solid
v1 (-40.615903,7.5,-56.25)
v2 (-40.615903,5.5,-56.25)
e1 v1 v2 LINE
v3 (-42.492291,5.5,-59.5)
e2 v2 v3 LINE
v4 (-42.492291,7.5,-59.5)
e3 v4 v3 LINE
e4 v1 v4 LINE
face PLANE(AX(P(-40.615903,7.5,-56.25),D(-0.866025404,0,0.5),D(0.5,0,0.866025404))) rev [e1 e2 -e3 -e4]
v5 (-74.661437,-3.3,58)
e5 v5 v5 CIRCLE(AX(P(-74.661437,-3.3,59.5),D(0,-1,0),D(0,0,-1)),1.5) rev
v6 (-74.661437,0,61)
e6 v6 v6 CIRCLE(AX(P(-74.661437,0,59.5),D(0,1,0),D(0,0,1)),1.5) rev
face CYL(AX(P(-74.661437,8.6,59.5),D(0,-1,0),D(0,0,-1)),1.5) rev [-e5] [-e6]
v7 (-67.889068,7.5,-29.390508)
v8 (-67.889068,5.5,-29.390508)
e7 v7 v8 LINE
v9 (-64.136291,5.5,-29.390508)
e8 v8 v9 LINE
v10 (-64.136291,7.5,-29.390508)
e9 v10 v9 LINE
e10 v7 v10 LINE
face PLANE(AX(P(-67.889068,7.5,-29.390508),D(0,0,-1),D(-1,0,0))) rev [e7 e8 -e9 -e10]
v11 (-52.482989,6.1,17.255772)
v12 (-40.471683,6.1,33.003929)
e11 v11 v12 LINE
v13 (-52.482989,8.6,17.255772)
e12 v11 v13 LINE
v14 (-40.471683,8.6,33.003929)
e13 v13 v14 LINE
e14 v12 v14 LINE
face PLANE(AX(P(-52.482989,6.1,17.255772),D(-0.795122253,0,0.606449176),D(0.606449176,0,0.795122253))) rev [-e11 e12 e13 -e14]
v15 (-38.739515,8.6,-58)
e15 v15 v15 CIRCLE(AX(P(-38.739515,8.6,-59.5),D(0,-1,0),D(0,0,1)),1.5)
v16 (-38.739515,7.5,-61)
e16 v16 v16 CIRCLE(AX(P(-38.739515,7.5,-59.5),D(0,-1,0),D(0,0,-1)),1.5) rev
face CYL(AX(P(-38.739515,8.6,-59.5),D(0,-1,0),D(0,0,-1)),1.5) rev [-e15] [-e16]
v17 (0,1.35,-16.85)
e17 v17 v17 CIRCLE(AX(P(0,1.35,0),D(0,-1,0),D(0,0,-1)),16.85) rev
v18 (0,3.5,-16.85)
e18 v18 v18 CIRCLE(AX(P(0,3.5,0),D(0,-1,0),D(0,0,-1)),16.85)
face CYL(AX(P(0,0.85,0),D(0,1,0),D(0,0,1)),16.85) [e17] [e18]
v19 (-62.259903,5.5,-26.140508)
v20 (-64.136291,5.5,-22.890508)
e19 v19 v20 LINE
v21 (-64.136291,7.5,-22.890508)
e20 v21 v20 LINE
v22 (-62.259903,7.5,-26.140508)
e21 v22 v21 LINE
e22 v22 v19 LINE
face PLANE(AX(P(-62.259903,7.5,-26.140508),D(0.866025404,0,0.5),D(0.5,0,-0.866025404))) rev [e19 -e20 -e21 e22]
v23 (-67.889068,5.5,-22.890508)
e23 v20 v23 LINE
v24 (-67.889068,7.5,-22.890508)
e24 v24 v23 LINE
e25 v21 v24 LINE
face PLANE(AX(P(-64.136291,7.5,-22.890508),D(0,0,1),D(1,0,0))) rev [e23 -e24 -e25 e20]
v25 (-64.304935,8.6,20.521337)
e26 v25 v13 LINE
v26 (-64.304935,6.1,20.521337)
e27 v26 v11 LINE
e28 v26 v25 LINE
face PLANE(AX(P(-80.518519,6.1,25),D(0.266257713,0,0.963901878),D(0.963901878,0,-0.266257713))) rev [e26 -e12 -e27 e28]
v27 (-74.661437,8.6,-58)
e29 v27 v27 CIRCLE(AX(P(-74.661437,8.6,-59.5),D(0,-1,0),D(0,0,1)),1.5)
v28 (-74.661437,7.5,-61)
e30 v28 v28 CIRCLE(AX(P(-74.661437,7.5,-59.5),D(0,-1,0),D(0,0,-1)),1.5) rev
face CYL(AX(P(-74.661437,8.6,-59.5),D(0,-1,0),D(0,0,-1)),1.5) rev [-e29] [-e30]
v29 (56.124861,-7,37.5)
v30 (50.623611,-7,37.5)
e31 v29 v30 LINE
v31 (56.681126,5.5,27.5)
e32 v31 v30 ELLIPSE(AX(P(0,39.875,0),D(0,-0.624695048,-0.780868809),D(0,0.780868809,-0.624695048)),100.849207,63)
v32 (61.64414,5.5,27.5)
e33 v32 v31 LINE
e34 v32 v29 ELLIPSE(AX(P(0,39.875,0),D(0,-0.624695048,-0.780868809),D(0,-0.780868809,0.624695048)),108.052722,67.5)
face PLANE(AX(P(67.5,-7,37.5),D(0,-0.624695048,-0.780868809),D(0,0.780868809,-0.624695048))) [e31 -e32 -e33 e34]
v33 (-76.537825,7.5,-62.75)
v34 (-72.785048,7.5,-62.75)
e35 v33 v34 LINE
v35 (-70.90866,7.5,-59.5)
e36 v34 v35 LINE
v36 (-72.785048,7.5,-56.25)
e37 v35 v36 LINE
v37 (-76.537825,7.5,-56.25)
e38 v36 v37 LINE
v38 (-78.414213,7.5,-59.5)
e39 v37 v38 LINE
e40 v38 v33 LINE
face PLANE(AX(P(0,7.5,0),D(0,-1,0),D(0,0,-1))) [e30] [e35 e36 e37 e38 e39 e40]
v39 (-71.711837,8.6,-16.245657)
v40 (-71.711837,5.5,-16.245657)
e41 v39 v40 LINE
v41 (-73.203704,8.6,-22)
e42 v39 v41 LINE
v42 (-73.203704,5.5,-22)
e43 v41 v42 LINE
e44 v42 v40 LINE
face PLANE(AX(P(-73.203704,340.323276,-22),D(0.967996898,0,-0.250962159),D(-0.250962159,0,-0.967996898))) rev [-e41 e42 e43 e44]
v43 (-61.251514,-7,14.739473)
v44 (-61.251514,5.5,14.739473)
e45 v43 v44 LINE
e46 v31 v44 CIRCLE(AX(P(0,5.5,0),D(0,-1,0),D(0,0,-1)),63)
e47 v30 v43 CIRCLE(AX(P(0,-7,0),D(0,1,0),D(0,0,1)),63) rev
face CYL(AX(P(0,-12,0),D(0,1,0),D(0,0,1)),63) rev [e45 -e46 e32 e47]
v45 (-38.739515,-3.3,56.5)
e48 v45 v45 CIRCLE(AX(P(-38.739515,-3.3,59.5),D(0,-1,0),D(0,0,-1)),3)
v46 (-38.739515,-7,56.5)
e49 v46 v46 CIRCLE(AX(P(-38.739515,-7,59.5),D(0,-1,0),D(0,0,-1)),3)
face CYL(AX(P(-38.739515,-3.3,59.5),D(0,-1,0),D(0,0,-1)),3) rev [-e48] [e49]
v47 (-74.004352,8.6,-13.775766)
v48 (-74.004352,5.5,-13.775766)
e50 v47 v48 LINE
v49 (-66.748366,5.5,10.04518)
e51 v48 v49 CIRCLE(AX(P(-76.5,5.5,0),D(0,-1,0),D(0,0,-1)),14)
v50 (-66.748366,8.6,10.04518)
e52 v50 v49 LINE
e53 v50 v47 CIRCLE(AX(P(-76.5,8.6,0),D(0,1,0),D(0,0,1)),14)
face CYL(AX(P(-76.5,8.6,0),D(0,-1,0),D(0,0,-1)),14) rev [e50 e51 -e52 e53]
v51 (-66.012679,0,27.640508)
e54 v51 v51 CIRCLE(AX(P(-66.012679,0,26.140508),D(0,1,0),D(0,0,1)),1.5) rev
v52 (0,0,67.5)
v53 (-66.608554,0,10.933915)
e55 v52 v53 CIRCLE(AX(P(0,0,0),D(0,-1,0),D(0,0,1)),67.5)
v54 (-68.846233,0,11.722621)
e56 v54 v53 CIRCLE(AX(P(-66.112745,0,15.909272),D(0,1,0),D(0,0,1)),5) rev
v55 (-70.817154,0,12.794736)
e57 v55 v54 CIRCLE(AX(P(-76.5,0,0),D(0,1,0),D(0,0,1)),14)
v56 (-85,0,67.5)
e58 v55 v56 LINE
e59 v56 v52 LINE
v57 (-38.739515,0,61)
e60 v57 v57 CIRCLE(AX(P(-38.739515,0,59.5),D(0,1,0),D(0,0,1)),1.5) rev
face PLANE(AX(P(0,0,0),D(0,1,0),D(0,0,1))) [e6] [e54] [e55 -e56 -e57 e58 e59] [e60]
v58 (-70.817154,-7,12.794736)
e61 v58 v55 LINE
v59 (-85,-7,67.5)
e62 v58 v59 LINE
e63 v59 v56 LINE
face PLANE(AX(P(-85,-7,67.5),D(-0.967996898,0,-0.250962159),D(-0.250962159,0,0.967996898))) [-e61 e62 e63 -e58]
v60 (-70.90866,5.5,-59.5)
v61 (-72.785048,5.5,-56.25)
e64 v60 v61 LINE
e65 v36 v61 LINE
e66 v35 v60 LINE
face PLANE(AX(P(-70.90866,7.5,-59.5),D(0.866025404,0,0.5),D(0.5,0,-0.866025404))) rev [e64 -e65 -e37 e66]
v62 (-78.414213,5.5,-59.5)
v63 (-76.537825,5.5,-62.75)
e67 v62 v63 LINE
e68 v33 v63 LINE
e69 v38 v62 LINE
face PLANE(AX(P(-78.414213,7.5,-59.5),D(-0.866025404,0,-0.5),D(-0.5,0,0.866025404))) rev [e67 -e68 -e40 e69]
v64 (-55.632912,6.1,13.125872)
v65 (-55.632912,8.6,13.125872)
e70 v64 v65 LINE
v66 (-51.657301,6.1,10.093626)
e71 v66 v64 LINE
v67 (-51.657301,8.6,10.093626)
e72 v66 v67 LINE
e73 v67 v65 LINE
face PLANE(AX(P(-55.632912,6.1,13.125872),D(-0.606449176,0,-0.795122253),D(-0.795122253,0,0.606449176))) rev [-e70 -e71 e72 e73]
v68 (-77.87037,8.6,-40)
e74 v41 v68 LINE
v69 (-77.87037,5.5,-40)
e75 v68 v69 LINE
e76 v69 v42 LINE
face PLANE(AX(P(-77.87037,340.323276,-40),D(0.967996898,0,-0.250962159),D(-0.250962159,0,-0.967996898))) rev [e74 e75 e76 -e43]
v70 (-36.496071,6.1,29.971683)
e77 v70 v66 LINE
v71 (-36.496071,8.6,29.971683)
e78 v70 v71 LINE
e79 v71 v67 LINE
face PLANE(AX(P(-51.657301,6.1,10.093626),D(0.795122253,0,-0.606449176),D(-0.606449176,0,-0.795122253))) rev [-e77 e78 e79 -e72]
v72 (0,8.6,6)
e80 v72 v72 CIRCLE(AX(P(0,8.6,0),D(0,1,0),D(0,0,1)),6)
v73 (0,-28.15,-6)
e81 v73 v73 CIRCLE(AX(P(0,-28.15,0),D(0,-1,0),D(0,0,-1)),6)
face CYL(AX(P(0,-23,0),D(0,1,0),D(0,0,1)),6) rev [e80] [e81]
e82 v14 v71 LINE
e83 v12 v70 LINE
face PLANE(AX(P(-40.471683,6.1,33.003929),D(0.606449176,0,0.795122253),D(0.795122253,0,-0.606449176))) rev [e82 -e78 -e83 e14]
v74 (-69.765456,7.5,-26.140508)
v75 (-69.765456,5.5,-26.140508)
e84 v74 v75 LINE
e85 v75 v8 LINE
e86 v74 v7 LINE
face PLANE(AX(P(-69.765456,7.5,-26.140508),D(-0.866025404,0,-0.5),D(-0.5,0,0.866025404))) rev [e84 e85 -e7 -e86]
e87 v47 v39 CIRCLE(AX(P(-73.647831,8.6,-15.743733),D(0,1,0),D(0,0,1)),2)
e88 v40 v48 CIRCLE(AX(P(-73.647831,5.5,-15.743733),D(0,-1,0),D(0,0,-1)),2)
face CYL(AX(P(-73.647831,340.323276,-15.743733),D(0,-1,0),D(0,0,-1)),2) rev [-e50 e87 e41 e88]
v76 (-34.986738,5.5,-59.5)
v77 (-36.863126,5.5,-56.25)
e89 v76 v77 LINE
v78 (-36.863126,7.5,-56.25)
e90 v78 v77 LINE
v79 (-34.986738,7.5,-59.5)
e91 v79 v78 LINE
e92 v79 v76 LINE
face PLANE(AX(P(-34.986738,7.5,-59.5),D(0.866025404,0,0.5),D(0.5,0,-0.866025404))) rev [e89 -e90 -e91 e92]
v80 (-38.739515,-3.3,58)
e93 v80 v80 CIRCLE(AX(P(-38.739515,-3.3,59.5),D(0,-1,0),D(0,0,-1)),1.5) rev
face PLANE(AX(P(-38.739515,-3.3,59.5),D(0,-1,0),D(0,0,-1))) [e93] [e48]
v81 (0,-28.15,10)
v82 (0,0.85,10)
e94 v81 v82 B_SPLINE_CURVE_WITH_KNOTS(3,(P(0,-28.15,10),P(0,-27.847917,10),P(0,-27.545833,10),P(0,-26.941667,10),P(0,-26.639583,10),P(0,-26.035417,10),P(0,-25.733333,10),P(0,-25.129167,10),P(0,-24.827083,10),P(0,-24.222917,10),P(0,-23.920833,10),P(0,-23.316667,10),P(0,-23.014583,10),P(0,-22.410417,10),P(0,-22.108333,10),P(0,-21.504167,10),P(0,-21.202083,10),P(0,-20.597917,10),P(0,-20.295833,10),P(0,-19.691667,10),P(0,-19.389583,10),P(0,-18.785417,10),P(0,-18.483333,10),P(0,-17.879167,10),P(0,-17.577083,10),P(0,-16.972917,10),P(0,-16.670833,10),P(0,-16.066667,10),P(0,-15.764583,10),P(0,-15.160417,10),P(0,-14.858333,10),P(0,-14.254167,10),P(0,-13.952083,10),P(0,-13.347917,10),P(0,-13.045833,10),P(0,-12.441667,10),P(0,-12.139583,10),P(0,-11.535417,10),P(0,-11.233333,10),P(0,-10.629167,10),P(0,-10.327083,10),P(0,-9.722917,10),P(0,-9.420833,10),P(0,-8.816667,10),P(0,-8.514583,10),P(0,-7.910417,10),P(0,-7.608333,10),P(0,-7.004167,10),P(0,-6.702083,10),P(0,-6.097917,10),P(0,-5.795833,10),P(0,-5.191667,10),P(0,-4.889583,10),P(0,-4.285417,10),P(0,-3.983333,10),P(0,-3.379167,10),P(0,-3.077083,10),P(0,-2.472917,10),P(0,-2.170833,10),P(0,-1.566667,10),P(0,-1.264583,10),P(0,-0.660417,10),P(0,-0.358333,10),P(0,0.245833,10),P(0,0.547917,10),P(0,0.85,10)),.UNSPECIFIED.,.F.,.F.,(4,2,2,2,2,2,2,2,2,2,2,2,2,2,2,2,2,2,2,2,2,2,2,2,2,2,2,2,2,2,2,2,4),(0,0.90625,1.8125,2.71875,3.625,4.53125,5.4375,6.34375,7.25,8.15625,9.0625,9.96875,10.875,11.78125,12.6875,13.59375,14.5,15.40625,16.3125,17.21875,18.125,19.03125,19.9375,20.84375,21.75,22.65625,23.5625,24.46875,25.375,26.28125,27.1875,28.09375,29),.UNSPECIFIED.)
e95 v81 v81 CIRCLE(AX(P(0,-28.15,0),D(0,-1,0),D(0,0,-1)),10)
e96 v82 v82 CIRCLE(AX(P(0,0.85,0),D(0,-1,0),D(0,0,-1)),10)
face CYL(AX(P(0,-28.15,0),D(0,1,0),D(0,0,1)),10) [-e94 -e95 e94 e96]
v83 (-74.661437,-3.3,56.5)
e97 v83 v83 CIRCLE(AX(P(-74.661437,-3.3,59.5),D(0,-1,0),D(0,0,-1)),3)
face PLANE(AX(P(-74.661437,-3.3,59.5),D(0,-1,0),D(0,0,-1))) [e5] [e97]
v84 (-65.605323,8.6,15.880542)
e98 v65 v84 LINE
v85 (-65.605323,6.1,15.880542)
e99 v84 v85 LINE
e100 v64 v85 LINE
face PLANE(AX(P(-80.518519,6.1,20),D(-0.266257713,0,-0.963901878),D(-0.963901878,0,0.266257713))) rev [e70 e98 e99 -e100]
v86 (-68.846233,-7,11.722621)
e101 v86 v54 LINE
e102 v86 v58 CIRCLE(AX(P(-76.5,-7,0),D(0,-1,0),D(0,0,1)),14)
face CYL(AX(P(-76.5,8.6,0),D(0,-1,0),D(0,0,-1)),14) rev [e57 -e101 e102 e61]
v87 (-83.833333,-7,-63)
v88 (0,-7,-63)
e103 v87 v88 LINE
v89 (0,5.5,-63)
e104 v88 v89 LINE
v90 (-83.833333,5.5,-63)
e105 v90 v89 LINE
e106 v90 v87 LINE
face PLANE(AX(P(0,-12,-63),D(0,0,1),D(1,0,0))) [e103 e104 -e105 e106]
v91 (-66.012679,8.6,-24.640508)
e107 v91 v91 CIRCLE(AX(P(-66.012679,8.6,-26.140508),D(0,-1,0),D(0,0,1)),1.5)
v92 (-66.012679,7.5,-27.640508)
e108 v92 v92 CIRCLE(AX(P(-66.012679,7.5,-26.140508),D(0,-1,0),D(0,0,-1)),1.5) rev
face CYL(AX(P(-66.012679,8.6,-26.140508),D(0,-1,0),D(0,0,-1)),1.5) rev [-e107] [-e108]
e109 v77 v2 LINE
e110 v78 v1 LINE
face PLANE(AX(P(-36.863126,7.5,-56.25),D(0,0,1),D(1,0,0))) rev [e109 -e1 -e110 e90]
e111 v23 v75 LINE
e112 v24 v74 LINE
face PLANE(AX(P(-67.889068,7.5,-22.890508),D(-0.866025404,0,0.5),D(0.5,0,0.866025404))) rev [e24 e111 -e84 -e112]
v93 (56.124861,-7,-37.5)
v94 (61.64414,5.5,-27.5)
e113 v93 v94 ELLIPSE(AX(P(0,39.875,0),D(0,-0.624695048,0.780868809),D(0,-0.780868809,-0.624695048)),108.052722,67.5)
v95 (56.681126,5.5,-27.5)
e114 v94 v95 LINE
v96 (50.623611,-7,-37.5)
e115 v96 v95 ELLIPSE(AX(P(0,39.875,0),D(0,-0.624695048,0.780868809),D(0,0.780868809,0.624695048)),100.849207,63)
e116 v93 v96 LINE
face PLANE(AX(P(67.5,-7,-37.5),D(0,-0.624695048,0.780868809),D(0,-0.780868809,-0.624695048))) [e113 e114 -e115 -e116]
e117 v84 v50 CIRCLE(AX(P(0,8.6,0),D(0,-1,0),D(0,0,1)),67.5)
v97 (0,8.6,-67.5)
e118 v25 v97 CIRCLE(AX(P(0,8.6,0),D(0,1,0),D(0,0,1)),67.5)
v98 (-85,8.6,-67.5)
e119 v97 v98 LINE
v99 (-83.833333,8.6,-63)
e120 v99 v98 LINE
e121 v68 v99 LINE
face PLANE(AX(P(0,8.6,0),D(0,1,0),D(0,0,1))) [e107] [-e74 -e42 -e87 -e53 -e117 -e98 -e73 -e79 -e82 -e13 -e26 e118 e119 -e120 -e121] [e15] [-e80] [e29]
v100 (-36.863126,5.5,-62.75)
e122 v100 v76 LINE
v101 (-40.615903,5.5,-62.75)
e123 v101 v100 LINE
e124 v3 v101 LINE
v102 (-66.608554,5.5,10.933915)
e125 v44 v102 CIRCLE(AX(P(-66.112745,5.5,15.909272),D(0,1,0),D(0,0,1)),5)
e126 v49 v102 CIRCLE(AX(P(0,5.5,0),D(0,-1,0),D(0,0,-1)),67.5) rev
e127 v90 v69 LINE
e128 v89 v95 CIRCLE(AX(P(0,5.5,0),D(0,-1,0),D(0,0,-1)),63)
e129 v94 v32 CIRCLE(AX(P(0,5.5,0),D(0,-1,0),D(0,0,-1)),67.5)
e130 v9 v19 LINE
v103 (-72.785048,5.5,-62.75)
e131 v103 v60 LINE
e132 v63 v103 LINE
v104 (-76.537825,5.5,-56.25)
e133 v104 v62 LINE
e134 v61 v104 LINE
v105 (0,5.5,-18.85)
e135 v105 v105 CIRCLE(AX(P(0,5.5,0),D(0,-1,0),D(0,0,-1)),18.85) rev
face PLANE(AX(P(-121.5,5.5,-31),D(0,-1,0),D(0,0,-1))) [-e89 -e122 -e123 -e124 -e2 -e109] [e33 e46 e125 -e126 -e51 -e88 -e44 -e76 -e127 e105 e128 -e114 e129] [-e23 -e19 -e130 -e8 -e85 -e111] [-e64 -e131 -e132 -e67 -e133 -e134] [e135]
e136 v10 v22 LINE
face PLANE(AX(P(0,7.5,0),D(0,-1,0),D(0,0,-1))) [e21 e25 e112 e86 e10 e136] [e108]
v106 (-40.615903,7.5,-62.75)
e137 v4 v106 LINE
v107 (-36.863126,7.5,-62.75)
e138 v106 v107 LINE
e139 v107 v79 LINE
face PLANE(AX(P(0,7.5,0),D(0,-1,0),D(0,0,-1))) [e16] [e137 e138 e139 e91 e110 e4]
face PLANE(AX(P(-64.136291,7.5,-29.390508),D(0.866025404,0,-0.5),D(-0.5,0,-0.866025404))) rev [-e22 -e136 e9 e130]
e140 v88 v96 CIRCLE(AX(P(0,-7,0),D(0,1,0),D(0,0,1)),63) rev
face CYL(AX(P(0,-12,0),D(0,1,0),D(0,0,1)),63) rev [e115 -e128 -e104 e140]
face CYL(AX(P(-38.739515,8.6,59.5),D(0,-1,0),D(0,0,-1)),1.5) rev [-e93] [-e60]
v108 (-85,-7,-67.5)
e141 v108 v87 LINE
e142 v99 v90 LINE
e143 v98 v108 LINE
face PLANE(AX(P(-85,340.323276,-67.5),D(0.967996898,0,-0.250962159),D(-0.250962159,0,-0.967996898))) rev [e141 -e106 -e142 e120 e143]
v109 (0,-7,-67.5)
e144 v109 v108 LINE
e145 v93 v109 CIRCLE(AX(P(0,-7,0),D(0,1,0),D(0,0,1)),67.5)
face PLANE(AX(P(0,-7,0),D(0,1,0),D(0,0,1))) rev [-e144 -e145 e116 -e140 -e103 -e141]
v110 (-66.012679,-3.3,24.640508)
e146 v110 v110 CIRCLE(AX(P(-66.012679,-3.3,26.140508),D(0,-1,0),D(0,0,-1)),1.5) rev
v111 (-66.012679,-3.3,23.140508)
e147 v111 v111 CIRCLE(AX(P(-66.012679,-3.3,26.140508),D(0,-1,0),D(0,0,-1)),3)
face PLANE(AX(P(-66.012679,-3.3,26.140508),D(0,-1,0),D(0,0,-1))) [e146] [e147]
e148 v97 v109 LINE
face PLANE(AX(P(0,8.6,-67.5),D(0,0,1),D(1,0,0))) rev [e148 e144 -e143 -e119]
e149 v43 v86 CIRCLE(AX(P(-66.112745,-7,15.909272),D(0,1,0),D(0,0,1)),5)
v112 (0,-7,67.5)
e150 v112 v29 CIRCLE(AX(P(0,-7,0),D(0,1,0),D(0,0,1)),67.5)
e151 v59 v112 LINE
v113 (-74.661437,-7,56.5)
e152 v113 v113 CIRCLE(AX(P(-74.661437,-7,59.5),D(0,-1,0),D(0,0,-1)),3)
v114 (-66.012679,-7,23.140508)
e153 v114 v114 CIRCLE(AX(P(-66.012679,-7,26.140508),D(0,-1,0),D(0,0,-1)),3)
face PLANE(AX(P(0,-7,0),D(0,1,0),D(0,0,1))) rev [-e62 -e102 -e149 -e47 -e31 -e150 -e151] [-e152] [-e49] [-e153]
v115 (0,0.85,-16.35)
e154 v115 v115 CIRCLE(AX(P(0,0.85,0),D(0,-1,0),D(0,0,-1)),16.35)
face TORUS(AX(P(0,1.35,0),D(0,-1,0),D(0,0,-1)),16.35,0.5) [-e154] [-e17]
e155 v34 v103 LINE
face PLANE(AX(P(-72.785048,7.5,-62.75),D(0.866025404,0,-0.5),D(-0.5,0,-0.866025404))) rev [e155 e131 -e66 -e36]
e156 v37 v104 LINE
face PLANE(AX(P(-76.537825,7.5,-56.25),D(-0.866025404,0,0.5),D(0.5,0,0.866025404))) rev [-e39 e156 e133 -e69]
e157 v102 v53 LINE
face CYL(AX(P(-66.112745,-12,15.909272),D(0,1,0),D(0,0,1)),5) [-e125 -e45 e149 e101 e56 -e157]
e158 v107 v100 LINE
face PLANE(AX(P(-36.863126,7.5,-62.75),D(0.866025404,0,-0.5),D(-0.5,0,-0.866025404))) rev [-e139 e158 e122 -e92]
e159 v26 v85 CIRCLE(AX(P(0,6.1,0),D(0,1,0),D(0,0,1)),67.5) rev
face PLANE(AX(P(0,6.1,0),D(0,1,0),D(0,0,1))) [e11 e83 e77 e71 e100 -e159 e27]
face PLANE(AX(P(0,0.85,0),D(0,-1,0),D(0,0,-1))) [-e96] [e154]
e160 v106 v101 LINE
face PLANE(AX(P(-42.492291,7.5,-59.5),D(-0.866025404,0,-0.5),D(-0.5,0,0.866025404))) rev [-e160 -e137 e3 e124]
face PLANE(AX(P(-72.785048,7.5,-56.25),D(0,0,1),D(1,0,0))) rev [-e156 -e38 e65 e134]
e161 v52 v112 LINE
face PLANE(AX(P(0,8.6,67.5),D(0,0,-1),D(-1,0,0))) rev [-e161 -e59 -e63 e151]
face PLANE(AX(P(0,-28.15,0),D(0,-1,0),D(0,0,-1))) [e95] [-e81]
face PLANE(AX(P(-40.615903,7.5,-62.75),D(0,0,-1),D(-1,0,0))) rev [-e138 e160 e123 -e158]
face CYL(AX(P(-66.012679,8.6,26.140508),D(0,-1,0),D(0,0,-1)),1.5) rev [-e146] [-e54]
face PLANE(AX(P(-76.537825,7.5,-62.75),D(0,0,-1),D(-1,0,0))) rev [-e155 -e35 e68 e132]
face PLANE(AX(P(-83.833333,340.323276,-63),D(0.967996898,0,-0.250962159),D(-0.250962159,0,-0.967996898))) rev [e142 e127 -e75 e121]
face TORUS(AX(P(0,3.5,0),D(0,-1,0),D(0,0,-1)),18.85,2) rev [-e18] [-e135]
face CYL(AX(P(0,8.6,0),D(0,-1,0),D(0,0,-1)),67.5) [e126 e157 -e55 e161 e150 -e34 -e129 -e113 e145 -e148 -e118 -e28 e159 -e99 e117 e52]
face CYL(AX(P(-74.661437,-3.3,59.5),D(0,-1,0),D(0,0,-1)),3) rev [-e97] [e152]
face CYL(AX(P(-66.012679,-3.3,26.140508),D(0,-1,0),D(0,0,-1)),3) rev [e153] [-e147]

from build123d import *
from build123d.topology import SkipClean

# Parameters (mm, degrees)
SALIENTE_EXTRUIR4_DEPTH      = 8.6
SALIENTE_EXTRUIR2_DEPTH      = 23
CORTAR_EXTRUIR1_DEPTH        = 174.347194959
CORTAR_EXTRUIR1_DEPTH_BACK   = 174.347194959
CROQUIS2_R                   = 14
CROQUIS2_R_2                 = 24
CROQUIS5_R                   = 2.5
CORTAR_EXTRUIR2_DEPTH        = 175.696336539
SALIENTE_EXTRUIR3_START      = -15.6
SALIENTE_EXTRUIR3_DEPTH      = 15.6
CORTAR_EXTRUIR3_DEPTH        = 174.347194959
CORTAR_EXTRUIR3_DEPTH_BACK   = 174.347194959
CROQUIS7_R                   = 6
CORTAR_EXTRUIR4_DEPTH        = 5
CORTAR_EXTRUIR4_DEPTH_BACK   = 12.5
REDONDEO1_R                  = 2
CROQUIS9_R                   = 16.85
CROQUIS9_R_2                 = 6
SALIENTE_EXTRUIR5_DEPTH      = 4.65
CROQUIS10_R                  = 10
CROQUIS10_R_2                = 6
SALIENTE_EXTRUIR6_DEPTH      = 29
REDONDEO2_R                  = 0.5
REDONDEO3_R                  = 2
SALIENTE_EXTRUIR7_REACH      = 177.079
CROQUIS12_R                  = 1.5
CORTAR_EXTRUIR5_DEPTH        = 174.111445318
CORTAR_EXTRUIR6_DEPTH        = 2
CROQUIS14_R                  = 3
CORTAR_EXTRUIR7_DEPTH        = 3.7
CROQUIS15_R                  = 2
CORTAR_EXTRUIR8_DEPTH        = 175.696336539
CROQUIS16_R                  = 4
CORTAR_EXTRUIR9_DEPTH        = 4
CORTAR_EXTRUIR10_DEPTH       = 10
CORTAR_EXTRUIR11_DEPTH       = 2.5
CROQUIS20_W                  = 12
CROQUIS20_H                  = 5
CORTAR_EXTRUIR12_DEPTH       = 176.700917755
REDONDEO4_R                  = 5
CORTAR_EXTRUIR13_START       = -31.6
CORTAR_EXTRUIR13_OUTLINE_W   = 12
CORTAR_EXTRUIR13_OUTLINE_H   = 5
CORTAR_EXTRUIR13_OUTLINE_R   = 2.5
CORTAR_EXTRUIR13_OUTLINE_R_2 = 24
CORTAR_EXTRUIR13_OUTLINE_R_3 = 2
CORTAR_EXTRUIR13_DEPTH       = 31.6
CORTAR_EXTRUIR14_DEPTH       = 8.6
CORTAR_EXTRUIR15_START       = 30
CORTAR_EXTRUIR15_DEPTH       = 83.132388274


# Read off the part's stored shape, not the designer's step: Cortar-Extruir13
with BuildPart() as part:
    # Croquis1 → Saliente-Extruir4 (new body)
    with BuildSketch(Plane(origin=(0, 0, 0), x_dir=(1, 0, 0), z_dir=(0, 1, 0))):
        with BuildLine():
            Line((0, -67.5), (-158, -67.5))
            Line((-158, -67.5), (-158, 67.5))
            Line((-158, 67.5), (0, 67.5))
            ThreePointArc((0, 67.5), (67.5, 0), (0, -67.5))
        make_face()
    extrude(amount=SALIENTE_EXTRUIR4_DEPTH)

    # Croquis3 → Saliente-Extruir2 (add)
    with BuildSketch(Plane.XZ):
        Polygon((-85, -67.5), (-68.148148148, -2.5), (-158, -2.5), (-158, -67.5), align=None)
    extrude(amount=SALIENTE_EXTRUIR2_DEPTH)

    # Croquis2 → Cortar-Extruir1 (cut, two sides: drawn at the far end of the back side and taken through both)
    with BuildSketch(Plane(origin=(0, 0, 0), x_dir=(1, 0, 0), z_dir=(0, 1, 0)).offset(-CORTAR_EXTRUIR1_DEPTH_BACK)):
        with Locations(Location((-76.5, 0, 0), (0, 0, 66.051358792))):
            Circle(CROQUIS2_R)
        with Locations(Location((-121.5, 31, 0), (0, 0, 90))):
            Circle(CROQUIS2_R_2)
        with Locations(Location((-121.5, -31, 0), (0, 0, 90))):
            Circle(CROQUIS2_R_2)
    extrude(amount=CORTAR_EXTRUIR1_DEPTH + CORTAR_EXTRUIR1_DEPTH_BACK, mode=Mode.SUBTRACT)

    # Croquis5 → Cortar-Extruir2 (cut, through all)
    with BuildSketch(Plane(origin=(0, 8.6, 0), x_dir=(1, 0, 0), z_dir=(0, 1, 0))):
        with Locations(Location((-145, -7.5, 0), (0, 0, 270))):
            Circle(CROQUIS5_R)
        with Locations(Location((-145, -54.5, 0), (0, 0, 270))):
            Circle(CROQUIS5_R)
        with Locations(Location((-98, -54.5, 0), (0, 0, 270))):
            Circle(CROQUIS5_R)
        with Locations(Location((-98, -7.5, 0), (0, 0, 270))):
            Circle(CROQUIS5_R)
        with Locations(Location((-145, 7.5, 0), (0, 0, 270))):
            Circle(CROQUIS5_R)
        with Locations(Location((-145, 54.5, 0), (0, 0, 270))):
            Circle(CROQUIS5_R)
    extrude(amount=-CORTAR_EXTRUIR2_DEPTH, mode=Mode.SUBTRACT)

    # Croquis6 → Saliente-Extruir3 (add)
    with BuildSketch(Plane(origin=(0, 8.6, 0), x_dir=(1, 0, 0), z_dir=(0, 1, 0)).offset(SALIENTE_EXTRUIR3_START)):
        with BuildLine():
            Line((0, -67.5), (-85, -67.5))
            Line((-85, -67.5), (-70.817153658, -12.794735536))
            ThreePointArc((-70.817153658, -12.794735536), (-62.5, 0), (-70.817153658, 12.794735536))
            Line((-70.817153658, 12.794735536), (-85, 67.5))
            Line((-85, 67.5), (0, 67.5))
            ThreePointArc((0, 67.5), (67.5, 0), (0, -67.5))
        make_face()
    extrude(amount=SALIENTE_EXTRUIR3_DEPTH)

    # Croquis7 → Cortar-Extruir3 (cut, two sides: drawn at the far end of the back side and taken through both)
    with BuildSketch(Plane(origin=(0, 0, 0), x_dir=(1, 0, 0), z_dir=(0, 1, 0)).offset(-CORTAR_EXTRUIR3_DEPTH_BACK)):
        with Locations(Location((0, 0, 0), (0, 0, 270))):
            Circle(CROQUIS7_R)
    extrude(amount=CORTAR_EXTRUIR3_DEPTH + CORTAR_EXTRUIR3_DEPTH_BACK, mode=Mode.SUBTRACT)

    # Croquis8 → Cortar-Extruir4 (cut, two sides: drawn at the far end of the back side and taken through both)
    with BuildSketch(Plane.XZ.offset(7).offset(-CORTAR_EXTRUIR4_DEPTH_BACK)):
        with BuildLine():
            Line((0, -63), (-116.397014468, -63))
            ThreePointArc((-116.397014468, -63), (-117.923471798, -62.761294784), (-119.304179798, -62.067971208))
            Line((-119.304179798, -62.067971208), (-135.454393581, -50.526261798))
            ThreePointArc((-135.454393581, -50.526261798), (-144.354214963, -23.673004816), (-121.5, -7))
            Line((-121.5, -7), (-95.5, -7))
            ThreePointArc((-95.5, -7), (-91.964466094, -5.535533906), (-90.5, -2))
            Line((-90.5, -2), (-90.5, 0))
            ThreePointArc((-90.5, 0), (-84.130208097, 11.737969347), (-70.817153658, 12.794735536))
            ThreePointArc((-70.817153658, 12.794735536), (-69.810181657, 12.29822469), (-68.84623323, 11.722621474))
            ThreePointArc((-68.84623323, 11.722621474), (-64.266892893, 11.262463458), (-61.251513841, 14.739472589))
            ThreePointArc((-61.251513841, 14.739472589), (49.485284546, 38.989827051), (0, -63))
        make_face()
    extrude(amount=CORTAR_EXTRUIR4_DEPTH + CORTAR_EXTRUIR4_DEPTH_BACK, mode=Mode.SUBTRACT)


with BuildPart() as cortar_extruir4_kept_piece:
    # of the separate pieces the step leaves, the one the design keeps (cortar_extruir4_pieces_kept)
    add(part.part.solids().sort_by_distance((0, 8.6, 67.5))[0])

    # Redondeo1
    redondeo1_edges = [cortar_extruir4_kept_piece.edges().sort_by_distance(p)[0] for p in [
        (-70.817153658, -17.5, -12.794735536),
    ]]
    fillet(redondeo1_edges, radius=REDONDEO1_R)

    # Croquis9 → Saliente-Extruir5 (add)
    with BuildSketch(Plane.XZ.offset(-5.5)):
        with Locations(Location((0, 0, 0), (0, 0, 270))):
            Circle(CROQUIS9_R)
        with Locations(Location((0, 0, 0), (0, 0, 90))):
            Circle(CROQUIS9_R_2, mode=Mode.SUBTRACT)
    extrude(amount=SALIENTE_EXTRUIR5_DEPTH)

    # Croquis10 → Saliente-Extruir6 (add)
    with BuildSketch(Plane.XZ.offset(-0.85)):
        with Locations(Location((0, 0, 0), (0, 0, 90))):
            Circle(CROQUIS10_R)
        with Locations(Location((0, 0, 0), (0, 0, 90))):
            Circle(CROQUIS10_R_2, mode=Mode.SUBTRACT)
    extrude(amount=SALIENTE_EXTRUIR6_DEPTH)

    # Redondeo2
    redondeo2_edges = [cortar_extruir4_kept_piece.edges().sort_by_distance(p)[0] for p in [
        (0, 0.85, 16.85),
    ]]
    fillet(redondeo2_edges, radius=REDONDEO2_R)

    # Redondeo3
    redondeo3_edges = [cortar_extruir4_kept_piece.edges().sort_by_distance(p)[0] for p in [
        (0, 5.5, 16.85),
    ]]
    fillet(redondeo3_edges, radius=REDONDEO3_R)

    # Croquis11 → Saliente-Extruir7 (add, up to next)
    with BuildSketch(Plane.XZ.offset(-5.5), mode=Mode.PRIVATE) as saliente_extruir7_sk1:
        with BuildLine():
            Line((-73.203703704, -22), (-77.87037037, -40))
            Line((-77.87037037, -40), (-99.251404539, -40))
            ThreePointArc((-99.251404539, -40), (-97.5, -31), (-99.251404539, -22))
            Line((-99.251404539, -22), (-73.203703704, -22))
        make_face()
    saliente_extruir7_tool1 = extrude(saliente_extruir7_sk1.sketch, amount=SALIENTE_EXTRUIR7_REACH, mode=Mode.PRIVATE) - cortar_extruir4_kept_piece.part
    add(saliente_extruir7_tool1.solids().sort_by_distance((-86.771742, 5.5, -30.689413))[0])

    # Croquis12 → Cortar-Extruir5 (cut, through all)
    with BuildSketch(Plane.XZ.offset(7)):
        with Locations(Location((-74.661436633, 59.5, 0), (0, 0, 270))):
            Circle(CROQUIS12_R)
        with Locations(Location((-66.012679429, 26.140507926, 0), (0, 0, 270))):
            Circle(CROQUIS12_R)
        with Locations(Location((-38.73951471, 59.5, 0), (0, 0, 270))):
            Circle(CROQUIS12_R)
        with Locations(Location((-38.73951471, -59.5, 0), (0, 0, 270))):
            Circle(CROQUIS12_R)
        with Locations(Location((-74.661436633, -59.5, 0), (0, 0, 270))):
            Circle(CROQUIS12_R)
        with Locations(Location((-66.012679429, -26.140507926, 0), (0, 0, 270))):
            Circle(CROQUIS12_R)
    extrude(amount=-CORTAR_EXTRUIR5_DEPTH, mode=Mode.SUBTRACT)

    # Croquis13 → Cortar-Extruir6 (cut)
    with BuildSketch(Plane.XZ.offset(-5.5)):
        Polygon((-70.908659884, -59.5), (-72.785048259, -56.25), (-76.537825008, -56.25), (-78.414213383, -59.5), (-76.537825008, -62.75), (-72.785048259, -62.75), align=None)
        Polygon((-62.259902679, -26.140507926), (-64.136291054, -22.890507926), (-67.889067804, -22.890507926), (-69.765456179, -26.140507926), (-67.889067804, -29.390507926), (-64.136291054, -29.390507926), align=None)
        Polygon((-34.986737961, -59.5), (-36.863126336, -56.25), (-40.615903085, -56.25), (-42.49229146, -59.5), (-40.615903085, -62.75), (-36.863126336, -62.75), align=None)
    extrude(amount=-CORTAR_EXTRUIR6_DEPTH, mode=Mode.SUBTRACT)

    # Croquis14 → Cortar-Extruir7 (cut)
    with BuildSketch(Plane.XZ.offset(7)):
        with Locations(Location((-66.012679429, 26.140507926, 0), (0, 0, 270))):
            Circle(CROQUIS14_R)
        with Locations(Location((-74.661436633, 59.5, 0), (0, 0, 270))):
            Circle(CROQUIS14_R)
        with Locations(Location((-38.73951471, 59.5, 0), (0, 0, 270))):
            Circle(CROQUIS14_R)
    extrude(amount=-CORTAR_EXTRUIR7_DEPTH, mode=Mode.SUBTRACT)

    # Croquis15 → Cortar-Extruir8 (cut, through all)
    with BuildSketch(Plane.XZ.offset(23)):
        with Locations(Location((-86.518518519, -31, 0), (0, 0, 270))):
            Circle(CROQUIS15_R)
        with Locations(Location((-86.518518519, 31, 0), (0, 0, 90))):
            Circle(CROQUIS15_R)
    extrude(amount=-CORTAR_EXTRUIR8_DEPTH, mode=Mode.SUBTRACT)

    # Croquis16 → Cortar-Extruir9 (cut)
    with BuildSketch(Plane.XZ):
        with Locations(Location((-86.518518519, 31, 0), (0, 0, 270))):
            Circle(CROQUIS16_R)
    extrude(amount=-CORTAR_EXTRUIR9_DEPTH, mode=Mode.SUBTRACT)

    # Croquis17 → Cortar-Extruir10 (cut)
    with BuildSketch(Plane.XZ.offset(23)):
        Polygon((-82.1883915, -31), (-84.353455009, -27.25), (-88.683582028, -27.25), (-90.848645537, -31), (-88.683582028, -34.75), (-84.353455009, -34.75), align=None)
    extrude(amount=-CORTAR_EXTRUIR10_DEPTH, mode=Mode.SUBTRACT)

    # Croquis19 → Cortar-Extruir11 (cut)
    with BuildSketch(Plane(origin=(0, 8.6, 0), x_dir=(1, 0, 0), z_dir=(0, 1, 0))):
        Polygon((-52.482988664, -17.255771853), (-40.471682692, -33.003928572), (-36.496071428, -29.971682692), (-51.657300826, -10.09362637), (-55.63291209, -13.12587225), (-80.518518519, -20), (-92.518518519, -20), (-92.518518519, -25), (-80.518518519, -25), align=None)
    extrude(amount=-CORTAR_EXTRUIR11_DEPTH, mode=Mode.SUBTRACT)

    # Croquis20 → Cortar-Extruir12 (cut, through all)
    with BuildSketch(Plane(origin=(0, 8.6, 0), x_dir=(1, 0, 0), z_dir=(0, 1, 0))):
        with Locations((-86.518518519, -22.5)):
            Rectangle(CROQUIS20_W, CROQUIS20_H)
    extrude(amount=-CORTAR_EXTRUIR12_DEPTH, mode=Mode.SUBTRACT)

    # Redondeo4
    # the kernel refuses this fillet: 5 mm, written as the material it takes off along each edge
    with BuildSketch(Plane(origin=(-80.518518519, 6.1, 25), x_dir=(0, -1, 0), z_dir=(0, 0, -1))) as redondeo4_piece_1_section:
        with BuildLine():
            CenterArc((REDONDEO4_R, -REDONDEO4_R), REDONDEO4_R, 90, 90)
            Line((0, -REDONDEO4_R), (0, 0))
            Line((0, 0), (REDONDEO4_R, 0))
        make_face()
    redondeo4_piece_1 = extrude(amount=5, mode=Mode.PRIVATE)
    redondeo4_piece_1 = split(redondeo4_piece_1, bisect_by=Plane(origin=(-78.850583618, 4.928175606, 24.539267905), z_dir=(-0.26625771274306737, 0, -0.9639018779963188)), keep=Keep.TOP, mode=Mode.PRIVATE)
    redondeo4_piece_1 = split(redondeo4_piece_1, bisect_by=Plane(origin=(-80.133815165, 4.928175606, 19.893733753), z_dir=(0.2662577127430677, 0, 0.9639018779963188)), keep=Keep.TOP, mode=Mode.PRIVATE)
    add(redondeo4_piece_1, mode=Mode.SUBTRACT)
    with BuildSketch(Plane(origin=(-80.518518519, 6.1, 25), x_dir=(0, -1, 0), z_dir=(0, 0, -1))) as redondeo4_piece_2_section:
        with BuildLine():
            CenterArc((REDONDEO4_R, -REDONDEO4_R), REDONDEO4_R, 90, 90)
            Line((0, -REDONDEO4_R), (0, 0))
            Line((0, 0), (REDONDEO4_R, 0))
        make_face()
    redondeo4_piece_2 = extrude(amount=17.5, mode=Mode.PRIVATE)
    redondeo4_piece_2 = split(redondeo4_piece_2, bisect_by=Plane(origin=(-78.44415934, 5.567637436, 19.427001708), z_dir=(0.2662577127430677, 0, 0.9639018779963188)), keep=Keep.TOP, mode=Mode.PRIVATE)
    redondeo4_piece_2 = split(redondeo4_piece_2, bisect_by=Plane(origin=(-78.36792826, 5.567637436, 20), z_dir=(0, 0, -1)), keep=Keep.TOP, mode=Mode.PRIVATE)
    add(redondeo4_piece_2, mode=Mode.SUBTRACT)

    # Cortar-Extruir13 outline → Cortar-Extruir13 (cut)
    with BuildSketch(Plane(origin=(0, 8.6, 0), x_dir=(1, 0, 0), z_dir=(0, 1, 0)).offset(CORTAR_EXTRUIR13_START)):
        with BuildLine():
            ThreePointArc((-70.817153658, -12.794735537), (-85.151755874, -11.006685255), (-90.274977314, 2.5))
            ThreePointArc((-90.274977314, 2.5), (-84.474430695, 11.506887289), (-74.004352038, 13.775766449))
            ThreePointArc((-74.004352038, 13.775766449), (-72.181961261, 14.383135348), (-71.711837104, 16.245657402))
            Line((-71.711837104, 16.245657402), (-73.203703704, 22))
            Line((-73.203703704, 22), (-77.87037037, 40))
            Line((-77.87037037, 40), (-83.833333333, 63))
            Line((-83.833333333, 63), (-85, 67.5))
            Line((-85, 67.5), (-158, 67.5))
            Line((-158, 67.5), (-158, -67.5))
            Line((-158, -67.5), (-85, -67.5))
            Line((-85, -67.5), (-70.817153658, -12.794735537))
        make_face()
        with Locations((-86.518518519, -22.5)):
            Rectangle(CORTAR_EXTRUIR13_OUTLINE_W, CORTAR_EXTRUIR13_OUTLINE_H, mode=Mode.SUBTRACT)
        with Locations((-145, -54.5)):
            Circle(CORTAR_EXTRUIR13_OUTLINE_R, mode=Mode.SUBTRACT)
        with Locations((-145, -7.5)):
            Circle(CORTAR_EXTRUIR13_OUTLINE_R, mode=Mode.SUBTRACT)
        with Locations((-121.5, -31)):
            Circle(CORTAR_EXTRUIR13_OUTLINE_R_2, mode=Mode.SUBTRACT)
        with Locations((-98, -54.5)):
            Circle(CORTAR_EXTRUIR13_OUTLINE_R, mode=Mode.SUBTRACT)
        with Locations((-98, -7.5)):
            Circle(CORTAR_EXTRUIR13_OUTLINE_R, mode=Mode.SUBTRACT)
        with Locations((-145, 54.5)):
            Circle(CORTAR_EXTRUIR13_OUTLINE_R, mode=Mode.SUBTRACT)
        with Locations((-121.5, 31)):
            Circle(CORTAR_EXTRUIR13_OUTLINE_R_2, mode=Mode.SUBTRACT)
        with Locations((-145, 7.5)):
            Circle(CORTAR_EXTRUIR13_OUTLINE_R, mode=Mode.SUBTRACT)
        with Locations((-86.518518519, -31)):
            Circle(CORTAR_EXTRUIR13_OUTLINE_R_3, mode=Mode.SUBTRACT)
        with Locations((-86.518518519, 31)):
            Circle(CORTAR_EXTRUIR13_OUTLINE_R_3, mode=Mode.SUBTRACT)
    extrude(amount=CORTAR_EXTRUIR13_DEPTH, mode=Mode.SUBTRACT)

    # Croquis22 → Cortar-Extruir14 (cut)
    with SkipClean():  # the faces are left unmerged after this step: merging them gives an invalid solid
        with BuildSketch(Plane(origin=(0, 8.6, 0), x_dir=(1, 0, 0), z_dir=(0, 1, 0))):
            with BuildLine():
                Line((-85, -67.5), (-67.5, 0))
                ThreePointArc((-67.5, 0), (-47.72970773, -47.72970773), (0, -67.5))
                Line((0, -67.5), (-85, -67.5))
            make_face()
        extrude(amount=-CORTAR_EXTRUIR14_DEPTH, mode=Mode.SUBTRACT)

    # Croquis23 → Cortar-Extruir15 (cut, through all)
    with SkipClean():  # the faces are left unmerged after this step: merging them gives an invalid solid
        with BuildSketch(Plane(origin=(0, 0, 0), x_dir=(0, 0, -1), z_dir=(1, 0, 0)).offset(CORTAR_EXTRUIR15_START)):
            Polygon((-37.5, -7), (-27.5, 5.5), (27.5, 5.5), (37.5, -7), align=None)
        extrude(amount=CORTAR_EXTRUIR15_DEPTH, mode=Mode.SUBTRACT)


solid = cortar_extruir4_kept_piece.part
